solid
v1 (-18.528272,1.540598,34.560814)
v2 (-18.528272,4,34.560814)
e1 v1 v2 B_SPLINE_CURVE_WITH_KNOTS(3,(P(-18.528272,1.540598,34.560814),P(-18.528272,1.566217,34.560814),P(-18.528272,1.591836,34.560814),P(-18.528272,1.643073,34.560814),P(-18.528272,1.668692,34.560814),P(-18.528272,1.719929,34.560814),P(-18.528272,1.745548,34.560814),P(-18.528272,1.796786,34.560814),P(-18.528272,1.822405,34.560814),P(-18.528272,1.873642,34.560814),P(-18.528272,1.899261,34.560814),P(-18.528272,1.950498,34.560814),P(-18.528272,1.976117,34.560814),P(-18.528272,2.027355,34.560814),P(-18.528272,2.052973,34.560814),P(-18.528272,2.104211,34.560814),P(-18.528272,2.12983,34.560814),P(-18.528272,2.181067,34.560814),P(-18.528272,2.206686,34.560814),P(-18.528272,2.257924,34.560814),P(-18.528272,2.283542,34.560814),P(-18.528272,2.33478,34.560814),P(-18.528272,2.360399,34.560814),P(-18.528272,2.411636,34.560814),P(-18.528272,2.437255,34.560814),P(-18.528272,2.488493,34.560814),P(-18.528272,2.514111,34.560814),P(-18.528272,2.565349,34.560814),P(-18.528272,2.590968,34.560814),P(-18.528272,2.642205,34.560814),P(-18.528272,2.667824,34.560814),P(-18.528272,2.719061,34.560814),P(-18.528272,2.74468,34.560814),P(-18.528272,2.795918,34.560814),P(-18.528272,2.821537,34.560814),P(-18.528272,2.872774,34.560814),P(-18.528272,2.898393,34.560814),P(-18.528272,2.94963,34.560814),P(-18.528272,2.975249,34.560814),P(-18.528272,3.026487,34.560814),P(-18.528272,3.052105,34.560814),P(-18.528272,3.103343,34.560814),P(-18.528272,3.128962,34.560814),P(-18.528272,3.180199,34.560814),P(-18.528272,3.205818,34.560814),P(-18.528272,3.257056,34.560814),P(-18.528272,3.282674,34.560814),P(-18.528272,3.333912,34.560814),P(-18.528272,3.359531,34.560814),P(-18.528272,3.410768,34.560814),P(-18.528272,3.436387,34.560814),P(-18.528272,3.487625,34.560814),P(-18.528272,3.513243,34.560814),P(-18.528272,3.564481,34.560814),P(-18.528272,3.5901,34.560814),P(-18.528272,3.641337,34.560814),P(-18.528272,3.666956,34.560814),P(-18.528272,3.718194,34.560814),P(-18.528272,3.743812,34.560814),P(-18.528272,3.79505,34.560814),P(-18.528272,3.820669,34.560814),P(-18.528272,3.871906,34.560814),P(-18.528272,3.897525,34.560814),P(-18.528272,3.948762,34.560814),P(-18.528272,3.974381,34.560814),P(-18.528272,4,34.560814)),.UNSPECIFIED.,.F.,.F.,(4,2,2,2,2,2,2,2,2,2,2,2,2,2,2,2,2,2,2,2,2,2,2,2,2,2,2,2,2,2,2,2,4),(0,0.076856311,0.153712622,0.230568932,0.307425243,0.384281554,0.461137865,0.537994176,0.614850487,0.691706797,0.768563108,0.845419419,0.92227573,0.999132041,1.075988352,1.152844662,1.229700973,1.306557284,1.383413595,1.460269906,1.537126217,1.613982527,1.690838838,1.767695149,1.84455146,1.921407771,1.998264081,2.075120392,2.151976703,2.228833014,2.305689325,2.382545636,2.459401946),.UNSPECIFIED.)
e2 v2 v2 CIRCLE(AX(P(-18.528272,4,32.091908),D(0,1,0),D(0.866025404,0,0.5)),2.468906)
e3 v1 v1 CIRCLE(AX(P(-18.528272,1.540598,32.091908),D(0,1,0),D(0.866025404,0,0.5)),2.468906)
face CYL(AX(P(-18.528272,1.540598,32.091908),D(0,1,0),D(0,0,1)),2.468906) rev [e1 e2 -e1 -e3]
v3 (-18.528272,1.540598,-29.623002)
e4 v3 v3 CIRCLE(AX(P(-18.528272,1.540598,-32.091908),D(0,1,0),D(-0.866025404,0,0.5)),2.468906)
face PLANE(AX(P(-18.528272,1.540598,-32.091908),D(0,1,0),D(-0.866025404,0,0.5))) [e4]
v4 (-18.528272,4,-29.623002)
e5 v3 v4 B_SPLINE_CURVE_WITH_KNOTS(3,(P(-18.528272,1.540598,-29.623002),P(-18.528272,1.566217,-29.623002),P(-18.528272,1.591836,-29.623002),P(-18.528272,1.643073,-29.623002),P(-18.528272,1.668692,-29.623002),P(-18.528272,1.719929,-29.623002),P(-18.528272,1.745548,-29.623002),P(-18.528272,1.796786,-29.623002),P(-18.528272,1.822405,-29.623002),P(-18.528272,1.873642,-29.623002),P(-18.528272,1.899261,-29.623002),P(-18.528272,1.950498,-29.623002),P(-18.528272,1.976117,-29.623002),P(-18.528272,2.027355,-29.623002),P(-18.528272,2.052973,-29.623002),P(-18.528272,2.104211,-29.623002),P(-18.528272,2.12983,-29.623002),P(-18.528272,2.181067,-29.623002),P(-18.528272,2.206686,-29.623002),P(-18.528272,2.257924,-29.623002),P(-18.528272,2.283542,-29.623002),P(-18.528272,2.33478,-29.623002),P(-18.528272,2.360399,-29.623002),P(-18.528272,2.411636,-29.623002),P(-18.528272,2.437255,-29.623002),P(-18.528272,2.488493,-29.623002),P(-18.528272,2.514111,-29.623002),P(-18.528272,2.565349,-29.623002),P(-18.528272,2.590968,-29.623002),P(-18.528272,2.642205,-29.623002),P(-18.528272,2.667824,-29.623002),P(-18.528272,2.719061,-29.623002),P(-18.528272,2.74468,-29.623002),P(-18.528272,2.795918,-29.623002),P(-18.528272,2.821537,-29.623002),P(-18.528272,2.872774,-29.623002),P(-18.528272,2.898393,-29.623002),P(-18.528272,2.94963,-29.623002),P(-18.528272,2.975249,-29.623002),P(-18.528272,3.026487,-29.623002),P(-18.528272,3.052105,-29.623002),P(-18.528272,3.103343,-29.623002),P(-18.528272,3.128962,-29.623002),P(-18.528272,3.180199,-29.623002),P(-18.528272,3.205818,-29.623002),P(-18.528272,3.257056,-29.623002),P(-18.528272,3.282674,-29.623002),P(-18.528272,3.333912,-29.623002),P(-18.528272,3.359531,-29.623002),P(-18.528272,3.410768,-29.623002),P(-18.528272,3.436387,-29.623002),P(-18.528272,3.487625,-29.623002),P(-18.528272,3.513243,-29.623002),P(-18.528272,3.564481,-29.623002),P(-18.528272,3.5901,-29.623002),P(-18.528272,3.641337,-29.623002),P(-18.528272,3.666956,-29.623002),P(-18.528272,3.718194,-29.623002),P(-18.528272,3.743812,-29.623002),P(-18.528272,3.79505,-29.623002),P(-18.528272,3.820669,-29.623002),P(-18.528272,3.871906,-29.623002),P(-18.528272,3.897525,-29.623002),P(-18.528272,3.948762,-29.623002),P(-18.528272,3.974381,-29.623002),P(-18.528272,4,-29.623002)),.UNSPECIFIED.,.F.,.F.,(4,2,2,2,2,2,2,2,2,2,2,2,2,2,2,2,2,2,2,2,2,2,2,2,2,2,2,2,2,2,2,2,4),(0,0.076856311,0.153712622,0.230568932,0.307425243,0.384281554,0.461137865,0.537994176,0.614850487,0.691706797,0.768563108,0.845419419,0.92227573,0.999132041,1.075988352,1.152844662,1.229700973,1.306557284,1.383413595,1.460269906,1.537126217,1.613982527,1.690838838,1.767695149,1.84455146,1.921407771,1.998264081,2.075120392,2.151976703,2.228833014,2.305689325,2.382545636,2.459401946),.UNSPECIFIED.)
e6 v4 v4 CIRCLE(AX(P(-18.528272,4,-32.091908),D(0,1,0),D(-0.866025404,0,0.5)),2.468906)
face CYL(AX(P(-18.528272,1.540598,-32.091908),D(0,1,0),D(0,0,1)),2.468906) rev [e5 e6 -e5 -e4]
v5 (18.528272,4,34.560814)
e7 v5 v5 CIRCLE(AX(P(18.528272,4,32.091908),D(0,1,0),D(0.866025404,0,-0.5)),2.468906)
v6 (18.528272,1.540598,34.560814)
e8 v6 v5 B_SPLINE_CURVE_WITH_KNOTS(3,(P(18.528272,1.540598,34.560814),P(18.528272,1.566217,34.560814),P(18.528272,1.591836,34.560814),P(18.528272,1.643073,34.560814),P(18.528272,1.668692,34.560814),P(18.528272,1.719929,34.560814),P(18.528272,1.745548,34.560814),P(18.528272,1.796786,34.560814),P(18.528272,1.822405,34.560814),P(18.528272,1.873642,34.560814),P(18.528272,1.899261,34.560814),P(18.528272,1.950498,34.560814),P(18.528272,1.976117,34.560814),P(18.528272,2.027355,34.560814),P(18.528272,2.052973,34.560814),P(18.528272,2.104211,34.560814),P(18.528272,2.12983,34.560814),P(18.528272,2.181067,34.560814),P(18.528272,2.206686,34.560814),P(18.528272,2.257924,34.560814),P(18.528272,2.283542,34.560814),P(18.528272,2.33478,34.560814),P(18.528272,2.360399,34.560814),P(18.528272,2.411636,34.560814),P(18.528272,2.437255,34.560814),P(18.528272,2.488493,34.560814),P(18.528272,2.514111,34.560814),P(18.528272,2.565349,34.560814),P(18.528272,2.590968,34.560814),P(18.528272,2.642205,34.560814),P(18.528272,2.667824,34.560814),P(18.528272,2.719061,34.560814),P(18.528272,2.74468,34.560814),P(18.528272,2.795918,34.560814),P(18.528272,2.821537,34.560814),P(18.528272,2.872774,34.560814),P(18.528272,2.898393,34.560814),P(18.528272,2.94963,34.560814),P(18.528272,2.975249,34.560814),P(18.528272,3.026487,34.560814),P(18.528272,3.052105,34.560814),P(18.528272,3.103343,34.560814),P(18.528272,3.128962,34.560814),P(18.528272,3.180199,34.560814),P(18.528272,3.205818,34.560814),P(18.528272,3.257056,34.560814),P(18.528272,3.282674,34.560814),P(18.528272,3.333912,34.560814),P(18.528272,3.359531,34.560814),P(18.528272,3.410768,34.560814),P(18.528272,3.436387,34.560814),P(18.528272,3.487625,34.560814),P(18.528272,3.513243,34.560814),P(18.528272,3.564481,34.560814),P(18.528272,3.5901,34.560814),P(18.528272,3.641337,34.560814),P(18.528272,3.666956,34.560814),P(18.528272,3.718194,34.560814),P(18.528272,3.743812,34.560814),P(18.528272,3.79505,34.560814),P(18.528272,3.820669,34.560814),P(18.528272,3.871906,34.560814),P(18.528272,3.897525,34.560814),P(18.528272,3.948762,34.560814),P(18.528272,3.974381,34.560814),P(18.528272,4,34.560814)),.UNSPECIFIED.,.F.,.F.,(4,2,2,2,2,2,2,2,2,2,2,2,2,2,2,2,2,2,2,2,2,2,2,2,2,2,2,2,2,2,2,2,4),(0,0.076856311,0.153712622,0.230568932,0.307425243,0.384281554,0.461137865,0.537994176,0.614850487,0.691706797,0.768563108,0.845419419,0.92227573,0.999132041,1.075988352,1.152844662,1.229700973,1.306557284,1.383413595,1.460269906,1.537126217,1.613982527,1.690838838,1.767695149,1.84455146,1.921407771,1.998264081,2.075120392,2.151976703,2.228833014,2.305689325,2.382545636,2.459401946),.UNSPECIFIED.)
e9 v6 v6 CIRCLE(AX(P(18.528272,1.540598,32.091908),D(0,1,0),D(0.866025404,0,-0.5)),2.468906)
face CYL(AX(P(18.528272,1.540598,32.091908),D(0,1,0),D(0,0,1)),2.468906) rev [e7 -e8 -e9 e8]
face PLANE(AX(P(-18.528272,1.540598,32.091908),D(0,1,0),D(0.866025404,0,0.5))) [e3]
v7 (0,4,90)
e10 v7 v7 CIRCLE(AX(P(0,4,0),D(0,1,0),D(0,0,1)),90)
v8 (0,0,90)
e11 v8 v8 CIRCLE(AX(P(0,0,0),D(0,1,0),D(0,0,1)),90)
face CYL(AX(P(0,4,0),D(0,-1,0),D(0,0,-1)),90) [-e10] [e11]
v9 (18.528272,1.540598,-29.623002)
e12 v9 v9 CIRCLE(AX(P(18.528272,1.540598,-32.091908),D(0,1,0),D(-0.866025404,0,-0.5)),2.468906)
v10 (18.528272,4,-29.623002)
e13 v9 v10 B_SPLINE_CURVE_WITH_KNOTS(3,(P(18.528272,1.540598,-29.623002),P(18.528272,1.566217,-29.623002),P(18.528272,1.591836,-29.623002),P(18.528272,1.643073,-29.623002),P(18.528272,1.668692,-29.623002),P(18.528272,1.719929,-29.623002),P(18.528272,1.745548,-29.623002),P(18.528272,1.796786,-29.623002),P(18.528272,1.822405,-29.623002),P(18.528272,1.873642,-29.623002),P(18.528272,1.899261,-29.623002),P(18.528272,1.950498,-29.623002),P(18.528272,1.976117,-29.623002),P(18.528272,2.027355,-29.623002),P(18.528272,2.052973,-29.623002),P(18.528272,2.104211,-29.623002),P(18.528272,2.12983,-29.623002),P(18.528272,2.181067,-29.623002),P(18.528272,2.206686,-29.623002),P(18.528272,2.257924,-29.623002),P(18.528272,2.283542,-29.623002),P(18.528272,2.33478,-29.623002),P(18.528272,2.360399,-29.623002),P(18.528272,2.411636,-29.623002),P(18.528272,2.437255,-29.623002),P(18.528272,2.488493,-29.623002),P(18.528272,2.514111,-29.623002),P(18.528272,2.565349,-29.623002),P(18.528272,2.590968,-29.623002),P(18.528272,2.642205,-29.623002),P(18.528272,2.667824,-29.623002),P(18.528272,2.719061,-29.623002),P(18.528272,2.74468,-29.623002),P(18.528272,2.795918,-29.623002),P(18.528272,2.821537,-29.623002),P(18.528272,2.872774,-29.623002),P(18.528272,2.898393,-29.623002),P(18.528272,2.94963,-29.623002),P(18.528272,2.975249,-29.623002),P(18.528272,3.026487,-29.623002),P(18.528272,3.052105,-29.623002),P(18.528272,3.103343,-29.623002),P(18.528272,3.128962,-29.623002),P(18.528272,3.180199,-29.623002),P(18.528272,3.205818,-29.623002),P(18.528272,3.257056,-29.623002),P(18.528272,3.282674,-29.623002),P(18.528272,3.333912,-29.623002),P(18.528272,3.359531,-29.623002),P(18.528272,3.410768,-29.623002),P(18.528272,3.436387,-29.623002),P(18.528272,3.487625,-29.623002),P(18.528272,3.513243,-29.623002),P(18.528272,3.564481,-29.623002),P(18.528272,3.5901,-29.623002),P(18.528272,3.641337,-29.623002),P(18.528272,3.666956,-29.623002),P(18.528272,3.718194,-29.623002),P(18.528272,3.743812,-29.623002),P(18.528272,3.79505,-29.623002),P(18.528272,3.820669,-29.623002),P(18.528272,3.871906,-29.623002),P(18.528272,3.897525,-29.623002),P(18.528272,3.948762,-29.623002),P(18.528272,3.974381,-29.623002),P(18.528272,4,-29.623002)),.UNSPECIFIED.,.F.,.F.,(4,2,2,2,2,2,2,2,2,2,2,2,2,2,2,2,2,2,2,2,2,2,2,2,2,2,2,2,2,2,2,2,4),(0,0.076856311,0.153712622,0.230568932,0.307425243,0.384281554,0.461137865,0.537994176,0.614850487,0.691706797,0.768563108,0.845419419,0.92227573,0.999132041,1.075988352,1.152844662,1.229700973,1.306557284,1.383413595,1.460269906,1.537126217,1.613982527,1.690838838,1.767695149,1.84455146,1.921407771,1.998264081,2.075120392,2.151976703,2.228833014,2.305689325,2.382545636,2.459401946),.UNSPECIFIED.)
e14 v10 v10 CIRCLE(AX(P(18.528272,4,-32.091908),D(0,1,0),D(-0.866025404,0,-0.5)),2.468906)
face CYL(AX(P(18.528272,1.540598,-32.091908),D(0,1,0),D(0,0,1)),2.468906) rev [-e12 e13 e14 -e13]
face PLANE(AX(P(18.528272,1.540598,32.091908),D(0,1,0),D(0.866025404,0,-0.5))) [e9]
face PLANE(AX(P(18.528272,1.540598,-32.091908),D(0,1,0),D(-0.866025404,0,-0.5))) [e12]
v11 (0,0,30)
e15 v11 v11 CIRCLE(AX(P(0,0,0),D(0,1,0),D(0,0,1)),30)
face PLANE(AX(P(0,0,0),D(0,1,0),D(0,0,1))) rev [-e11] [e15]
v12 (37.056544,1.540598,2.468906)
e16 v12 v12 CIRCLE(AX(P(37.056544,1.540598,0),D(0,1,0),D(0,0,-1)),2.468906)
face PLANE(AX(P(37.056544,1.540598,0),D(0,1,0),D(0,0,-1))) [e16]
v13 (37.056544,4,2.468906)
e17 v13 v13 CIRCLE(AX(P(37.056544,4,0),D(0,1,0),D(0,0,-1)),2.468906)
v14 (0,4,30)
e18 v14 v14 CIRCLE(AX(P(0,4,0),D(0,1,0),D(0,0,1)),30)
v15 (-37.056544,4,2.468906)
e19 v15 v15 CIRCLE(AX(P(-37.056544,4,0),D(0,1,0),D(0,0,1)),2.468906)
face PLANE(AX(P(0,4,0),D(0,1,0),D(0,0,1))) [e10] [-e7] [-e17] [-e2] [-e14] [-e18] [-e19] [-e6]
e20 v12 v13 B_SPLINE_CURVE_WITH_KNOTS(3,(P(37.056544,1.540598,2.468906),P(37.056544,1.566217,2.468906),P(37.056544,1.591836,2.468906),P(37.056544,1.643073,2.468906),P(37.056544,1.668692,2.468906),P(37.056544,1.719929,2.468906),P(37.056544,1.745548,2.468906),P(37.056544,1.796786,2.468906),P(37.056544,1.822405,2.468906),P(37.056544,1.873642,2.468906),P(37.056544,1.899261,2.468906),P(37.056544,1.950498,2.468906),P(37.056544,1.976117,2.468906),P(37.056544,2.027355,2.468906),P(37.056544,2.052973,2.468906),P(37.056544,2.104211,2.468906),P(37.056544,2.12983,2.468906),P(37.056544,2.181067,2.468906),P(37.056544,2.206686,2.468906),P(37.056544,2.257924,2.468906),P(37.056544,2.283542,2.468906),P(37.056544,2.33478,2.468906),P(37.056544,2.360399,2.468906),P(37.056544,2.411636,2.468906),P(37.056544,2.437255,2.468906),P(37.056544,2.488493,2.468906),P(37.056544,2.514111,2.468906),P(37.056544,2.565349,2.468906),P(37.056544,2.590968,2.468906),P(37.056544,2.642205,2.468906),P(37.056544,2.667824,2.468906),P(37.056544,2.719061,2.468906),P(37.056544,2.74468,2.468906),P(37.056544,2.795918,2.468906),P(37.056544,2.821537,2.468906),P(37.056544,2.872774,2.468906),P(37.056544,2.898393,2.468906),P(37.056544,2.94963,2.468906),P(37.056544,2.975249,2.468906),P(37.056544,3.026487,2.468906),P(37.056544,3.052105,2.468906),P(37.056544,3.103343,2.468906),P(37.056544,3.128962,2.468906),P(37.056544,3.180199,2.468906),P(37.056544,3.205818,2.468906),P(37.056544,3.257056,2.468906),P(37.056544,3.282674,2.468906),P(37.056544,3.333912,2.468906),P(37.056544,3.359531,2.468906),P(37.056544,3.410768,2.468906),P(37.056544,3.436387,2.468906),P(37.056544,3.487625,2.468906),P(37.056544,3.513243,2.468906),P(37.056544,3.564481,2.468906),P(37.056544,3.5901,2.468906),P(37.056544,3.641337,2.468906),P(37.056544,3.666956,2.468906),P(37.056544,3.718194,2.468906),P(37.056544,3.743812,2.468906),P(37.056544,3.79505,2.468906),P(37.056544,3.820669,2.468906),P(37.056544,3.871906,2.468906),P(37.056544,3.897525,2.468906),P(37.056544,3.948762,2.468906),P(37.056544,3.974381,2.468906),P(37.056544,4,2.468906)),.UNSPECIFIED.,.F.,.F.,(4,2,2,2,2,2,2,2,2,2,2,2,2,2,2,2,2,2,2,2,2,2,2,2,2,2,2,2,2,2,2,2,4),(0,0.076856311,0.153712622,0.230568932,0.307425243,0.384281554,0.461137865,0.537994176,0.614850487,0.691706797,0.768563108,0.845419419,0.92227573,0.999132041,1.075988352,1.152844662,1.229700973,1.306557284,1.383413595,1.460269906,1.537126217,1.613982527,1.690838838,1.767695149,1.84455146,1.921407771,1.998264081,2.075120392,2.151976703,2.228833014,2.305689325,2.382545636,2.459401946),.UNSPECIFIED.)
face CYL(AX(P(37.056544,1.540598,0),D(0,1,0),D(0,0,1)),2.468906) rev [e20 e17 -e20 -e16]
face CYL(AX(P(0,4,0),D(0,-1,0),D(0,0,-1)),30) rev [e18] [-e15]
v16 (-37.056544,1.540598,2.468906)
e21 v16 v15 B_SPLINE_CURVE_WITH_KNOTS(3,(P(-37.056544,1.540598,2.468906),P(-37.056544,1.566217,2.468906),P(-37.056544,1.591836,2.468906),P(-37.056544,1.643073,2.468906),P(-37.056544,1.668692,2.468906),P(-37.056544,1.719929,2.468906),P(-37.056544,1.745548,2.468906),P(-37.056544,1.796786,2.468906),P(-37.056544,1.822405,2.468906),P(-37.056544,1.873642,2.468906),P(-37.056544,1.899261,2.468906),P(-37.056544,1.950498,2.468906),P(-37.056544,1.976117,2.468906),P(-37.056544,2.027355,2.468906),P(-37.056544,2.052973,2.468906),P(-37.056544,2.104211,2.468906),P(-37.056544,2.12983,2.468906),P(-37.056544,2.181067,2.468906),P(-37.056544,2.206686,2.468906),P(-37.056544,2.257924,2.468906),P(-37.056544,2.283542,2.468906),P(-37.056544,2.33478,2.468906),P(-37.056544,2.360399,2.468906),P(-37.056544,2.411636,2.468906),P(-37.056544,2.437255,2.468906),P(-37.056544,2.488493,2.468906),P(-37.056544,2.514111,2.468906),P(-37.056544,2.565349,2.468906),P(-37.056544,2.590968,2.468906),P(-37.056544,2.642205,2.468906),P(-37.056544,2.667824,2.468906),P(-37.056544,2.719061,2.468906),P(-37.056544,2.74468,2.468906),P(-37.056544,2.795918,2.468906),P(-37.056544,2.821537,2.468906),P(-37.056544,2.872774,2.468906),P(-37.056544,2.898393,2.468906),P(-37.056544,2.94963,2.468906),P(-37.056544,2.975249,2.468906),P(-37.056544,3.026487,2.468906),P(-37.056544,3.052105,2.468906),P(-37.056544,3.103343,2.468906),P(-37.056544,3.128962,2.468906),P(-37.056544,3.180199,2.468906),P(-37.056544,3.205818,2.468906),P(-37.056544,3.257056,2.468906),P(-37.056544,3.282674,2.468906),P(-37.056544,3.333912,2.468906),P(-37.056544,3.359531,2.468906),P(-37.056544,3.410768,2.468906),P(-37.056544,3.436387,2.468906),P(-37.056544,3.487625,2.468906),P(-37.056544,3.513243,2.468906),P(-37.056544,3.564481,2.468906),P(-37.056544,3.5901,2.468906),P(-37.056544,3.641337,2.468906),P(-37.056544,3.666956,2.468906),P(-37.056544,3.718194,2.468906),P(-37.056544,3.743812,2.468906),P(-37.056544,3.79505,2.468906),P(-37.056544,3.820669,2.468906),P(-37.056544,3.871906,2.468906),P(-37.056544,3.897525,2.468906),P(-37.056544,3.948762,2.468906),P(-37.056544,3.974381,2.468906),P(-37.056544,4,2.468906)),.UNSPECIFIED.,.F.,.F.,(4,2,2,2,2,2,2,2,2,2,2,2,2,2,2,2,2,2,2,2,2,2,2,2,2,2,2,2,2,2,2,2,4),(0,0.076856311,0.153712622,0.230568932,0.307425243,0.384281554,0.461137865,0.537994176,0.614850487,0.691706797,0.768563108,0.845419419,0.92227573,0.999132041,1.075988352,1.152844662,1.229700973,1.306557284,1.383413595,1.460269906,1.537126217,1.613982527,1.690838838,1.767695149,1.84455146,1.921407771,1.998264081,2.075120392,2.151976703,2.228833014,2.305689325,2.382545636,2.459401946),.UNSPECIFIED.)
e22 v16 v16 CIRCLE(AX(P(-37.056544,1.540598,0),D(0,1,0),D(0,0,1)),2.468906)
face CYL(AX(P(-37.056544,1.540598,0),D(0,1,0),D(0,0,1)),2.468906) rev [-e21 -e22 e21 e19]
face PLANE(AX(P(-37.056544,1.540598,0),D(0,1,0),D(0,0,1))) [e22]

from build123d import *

# Parameters (mm, degrees)
SKETCH1_R           = 90
BOSS_EXTRUDE1_DEPTH = 4
SKETCH2_R           = 30
CUT_EXTRUDE1_DEPTH  = 128.342059038
SKETCH3_R           = 2.468905912
CUT_EXTRUDE2_DEPTH  = 2.459401946
CIRPATTERN1_COUNT   = 6


with BuildPart() as part:
    # Sketch1 → Boss-Extrude1 (new body)
    with BuildSketch(Plane(origin=(0, 0, 0), x_dir=(1, 0, 0), z_dir=(0, 1, 0))):
        Circle(SKETCH1_R)
    extrude(amount=BOSS_EXTRUDE1_DEPTH)

    # Sketch2 → Cut-Extrude1 (cut, through all)
    with BuildSketch(Plane(origin=(0, 0, 0), x_dir=(1, 0, 0), z_dir=(0, 1, 0))):
        Circle(SKETCH2_R)
    extrude(amount=CUT_EXTRUDE1_DEPTH, mode=Mode.SUBTRACT)

    # Sketch3 → Cut-Extrude2 (cut)
    with BuildSketch(Plane(origin=(0, 4, 0), x_dir=(1, 0, 0), z_dir=(0, 1, 0))):
        with Locations((-37.056543623, 0)):
            Circle(SKETCH3_R)
    cut_extrude2 = extrude(amount=-CUT_EXTRUDE2_DEPTH, mode=Mode.SUBTRACT)

    # CirPattern1: Cut-Extrude2 ×6 about axis
    cirpattern1_axis = Axis((0, 0, 0), (0, 1, 0))
    for i in range(1, CIRPATTERN1_COUNT):
        add(cut_extrude2.rotate(cirpattern1_axis, i * 360 / CIRPATTERN1_COUNT), mode=Mode.SUBTRACT)


solid = part.part
